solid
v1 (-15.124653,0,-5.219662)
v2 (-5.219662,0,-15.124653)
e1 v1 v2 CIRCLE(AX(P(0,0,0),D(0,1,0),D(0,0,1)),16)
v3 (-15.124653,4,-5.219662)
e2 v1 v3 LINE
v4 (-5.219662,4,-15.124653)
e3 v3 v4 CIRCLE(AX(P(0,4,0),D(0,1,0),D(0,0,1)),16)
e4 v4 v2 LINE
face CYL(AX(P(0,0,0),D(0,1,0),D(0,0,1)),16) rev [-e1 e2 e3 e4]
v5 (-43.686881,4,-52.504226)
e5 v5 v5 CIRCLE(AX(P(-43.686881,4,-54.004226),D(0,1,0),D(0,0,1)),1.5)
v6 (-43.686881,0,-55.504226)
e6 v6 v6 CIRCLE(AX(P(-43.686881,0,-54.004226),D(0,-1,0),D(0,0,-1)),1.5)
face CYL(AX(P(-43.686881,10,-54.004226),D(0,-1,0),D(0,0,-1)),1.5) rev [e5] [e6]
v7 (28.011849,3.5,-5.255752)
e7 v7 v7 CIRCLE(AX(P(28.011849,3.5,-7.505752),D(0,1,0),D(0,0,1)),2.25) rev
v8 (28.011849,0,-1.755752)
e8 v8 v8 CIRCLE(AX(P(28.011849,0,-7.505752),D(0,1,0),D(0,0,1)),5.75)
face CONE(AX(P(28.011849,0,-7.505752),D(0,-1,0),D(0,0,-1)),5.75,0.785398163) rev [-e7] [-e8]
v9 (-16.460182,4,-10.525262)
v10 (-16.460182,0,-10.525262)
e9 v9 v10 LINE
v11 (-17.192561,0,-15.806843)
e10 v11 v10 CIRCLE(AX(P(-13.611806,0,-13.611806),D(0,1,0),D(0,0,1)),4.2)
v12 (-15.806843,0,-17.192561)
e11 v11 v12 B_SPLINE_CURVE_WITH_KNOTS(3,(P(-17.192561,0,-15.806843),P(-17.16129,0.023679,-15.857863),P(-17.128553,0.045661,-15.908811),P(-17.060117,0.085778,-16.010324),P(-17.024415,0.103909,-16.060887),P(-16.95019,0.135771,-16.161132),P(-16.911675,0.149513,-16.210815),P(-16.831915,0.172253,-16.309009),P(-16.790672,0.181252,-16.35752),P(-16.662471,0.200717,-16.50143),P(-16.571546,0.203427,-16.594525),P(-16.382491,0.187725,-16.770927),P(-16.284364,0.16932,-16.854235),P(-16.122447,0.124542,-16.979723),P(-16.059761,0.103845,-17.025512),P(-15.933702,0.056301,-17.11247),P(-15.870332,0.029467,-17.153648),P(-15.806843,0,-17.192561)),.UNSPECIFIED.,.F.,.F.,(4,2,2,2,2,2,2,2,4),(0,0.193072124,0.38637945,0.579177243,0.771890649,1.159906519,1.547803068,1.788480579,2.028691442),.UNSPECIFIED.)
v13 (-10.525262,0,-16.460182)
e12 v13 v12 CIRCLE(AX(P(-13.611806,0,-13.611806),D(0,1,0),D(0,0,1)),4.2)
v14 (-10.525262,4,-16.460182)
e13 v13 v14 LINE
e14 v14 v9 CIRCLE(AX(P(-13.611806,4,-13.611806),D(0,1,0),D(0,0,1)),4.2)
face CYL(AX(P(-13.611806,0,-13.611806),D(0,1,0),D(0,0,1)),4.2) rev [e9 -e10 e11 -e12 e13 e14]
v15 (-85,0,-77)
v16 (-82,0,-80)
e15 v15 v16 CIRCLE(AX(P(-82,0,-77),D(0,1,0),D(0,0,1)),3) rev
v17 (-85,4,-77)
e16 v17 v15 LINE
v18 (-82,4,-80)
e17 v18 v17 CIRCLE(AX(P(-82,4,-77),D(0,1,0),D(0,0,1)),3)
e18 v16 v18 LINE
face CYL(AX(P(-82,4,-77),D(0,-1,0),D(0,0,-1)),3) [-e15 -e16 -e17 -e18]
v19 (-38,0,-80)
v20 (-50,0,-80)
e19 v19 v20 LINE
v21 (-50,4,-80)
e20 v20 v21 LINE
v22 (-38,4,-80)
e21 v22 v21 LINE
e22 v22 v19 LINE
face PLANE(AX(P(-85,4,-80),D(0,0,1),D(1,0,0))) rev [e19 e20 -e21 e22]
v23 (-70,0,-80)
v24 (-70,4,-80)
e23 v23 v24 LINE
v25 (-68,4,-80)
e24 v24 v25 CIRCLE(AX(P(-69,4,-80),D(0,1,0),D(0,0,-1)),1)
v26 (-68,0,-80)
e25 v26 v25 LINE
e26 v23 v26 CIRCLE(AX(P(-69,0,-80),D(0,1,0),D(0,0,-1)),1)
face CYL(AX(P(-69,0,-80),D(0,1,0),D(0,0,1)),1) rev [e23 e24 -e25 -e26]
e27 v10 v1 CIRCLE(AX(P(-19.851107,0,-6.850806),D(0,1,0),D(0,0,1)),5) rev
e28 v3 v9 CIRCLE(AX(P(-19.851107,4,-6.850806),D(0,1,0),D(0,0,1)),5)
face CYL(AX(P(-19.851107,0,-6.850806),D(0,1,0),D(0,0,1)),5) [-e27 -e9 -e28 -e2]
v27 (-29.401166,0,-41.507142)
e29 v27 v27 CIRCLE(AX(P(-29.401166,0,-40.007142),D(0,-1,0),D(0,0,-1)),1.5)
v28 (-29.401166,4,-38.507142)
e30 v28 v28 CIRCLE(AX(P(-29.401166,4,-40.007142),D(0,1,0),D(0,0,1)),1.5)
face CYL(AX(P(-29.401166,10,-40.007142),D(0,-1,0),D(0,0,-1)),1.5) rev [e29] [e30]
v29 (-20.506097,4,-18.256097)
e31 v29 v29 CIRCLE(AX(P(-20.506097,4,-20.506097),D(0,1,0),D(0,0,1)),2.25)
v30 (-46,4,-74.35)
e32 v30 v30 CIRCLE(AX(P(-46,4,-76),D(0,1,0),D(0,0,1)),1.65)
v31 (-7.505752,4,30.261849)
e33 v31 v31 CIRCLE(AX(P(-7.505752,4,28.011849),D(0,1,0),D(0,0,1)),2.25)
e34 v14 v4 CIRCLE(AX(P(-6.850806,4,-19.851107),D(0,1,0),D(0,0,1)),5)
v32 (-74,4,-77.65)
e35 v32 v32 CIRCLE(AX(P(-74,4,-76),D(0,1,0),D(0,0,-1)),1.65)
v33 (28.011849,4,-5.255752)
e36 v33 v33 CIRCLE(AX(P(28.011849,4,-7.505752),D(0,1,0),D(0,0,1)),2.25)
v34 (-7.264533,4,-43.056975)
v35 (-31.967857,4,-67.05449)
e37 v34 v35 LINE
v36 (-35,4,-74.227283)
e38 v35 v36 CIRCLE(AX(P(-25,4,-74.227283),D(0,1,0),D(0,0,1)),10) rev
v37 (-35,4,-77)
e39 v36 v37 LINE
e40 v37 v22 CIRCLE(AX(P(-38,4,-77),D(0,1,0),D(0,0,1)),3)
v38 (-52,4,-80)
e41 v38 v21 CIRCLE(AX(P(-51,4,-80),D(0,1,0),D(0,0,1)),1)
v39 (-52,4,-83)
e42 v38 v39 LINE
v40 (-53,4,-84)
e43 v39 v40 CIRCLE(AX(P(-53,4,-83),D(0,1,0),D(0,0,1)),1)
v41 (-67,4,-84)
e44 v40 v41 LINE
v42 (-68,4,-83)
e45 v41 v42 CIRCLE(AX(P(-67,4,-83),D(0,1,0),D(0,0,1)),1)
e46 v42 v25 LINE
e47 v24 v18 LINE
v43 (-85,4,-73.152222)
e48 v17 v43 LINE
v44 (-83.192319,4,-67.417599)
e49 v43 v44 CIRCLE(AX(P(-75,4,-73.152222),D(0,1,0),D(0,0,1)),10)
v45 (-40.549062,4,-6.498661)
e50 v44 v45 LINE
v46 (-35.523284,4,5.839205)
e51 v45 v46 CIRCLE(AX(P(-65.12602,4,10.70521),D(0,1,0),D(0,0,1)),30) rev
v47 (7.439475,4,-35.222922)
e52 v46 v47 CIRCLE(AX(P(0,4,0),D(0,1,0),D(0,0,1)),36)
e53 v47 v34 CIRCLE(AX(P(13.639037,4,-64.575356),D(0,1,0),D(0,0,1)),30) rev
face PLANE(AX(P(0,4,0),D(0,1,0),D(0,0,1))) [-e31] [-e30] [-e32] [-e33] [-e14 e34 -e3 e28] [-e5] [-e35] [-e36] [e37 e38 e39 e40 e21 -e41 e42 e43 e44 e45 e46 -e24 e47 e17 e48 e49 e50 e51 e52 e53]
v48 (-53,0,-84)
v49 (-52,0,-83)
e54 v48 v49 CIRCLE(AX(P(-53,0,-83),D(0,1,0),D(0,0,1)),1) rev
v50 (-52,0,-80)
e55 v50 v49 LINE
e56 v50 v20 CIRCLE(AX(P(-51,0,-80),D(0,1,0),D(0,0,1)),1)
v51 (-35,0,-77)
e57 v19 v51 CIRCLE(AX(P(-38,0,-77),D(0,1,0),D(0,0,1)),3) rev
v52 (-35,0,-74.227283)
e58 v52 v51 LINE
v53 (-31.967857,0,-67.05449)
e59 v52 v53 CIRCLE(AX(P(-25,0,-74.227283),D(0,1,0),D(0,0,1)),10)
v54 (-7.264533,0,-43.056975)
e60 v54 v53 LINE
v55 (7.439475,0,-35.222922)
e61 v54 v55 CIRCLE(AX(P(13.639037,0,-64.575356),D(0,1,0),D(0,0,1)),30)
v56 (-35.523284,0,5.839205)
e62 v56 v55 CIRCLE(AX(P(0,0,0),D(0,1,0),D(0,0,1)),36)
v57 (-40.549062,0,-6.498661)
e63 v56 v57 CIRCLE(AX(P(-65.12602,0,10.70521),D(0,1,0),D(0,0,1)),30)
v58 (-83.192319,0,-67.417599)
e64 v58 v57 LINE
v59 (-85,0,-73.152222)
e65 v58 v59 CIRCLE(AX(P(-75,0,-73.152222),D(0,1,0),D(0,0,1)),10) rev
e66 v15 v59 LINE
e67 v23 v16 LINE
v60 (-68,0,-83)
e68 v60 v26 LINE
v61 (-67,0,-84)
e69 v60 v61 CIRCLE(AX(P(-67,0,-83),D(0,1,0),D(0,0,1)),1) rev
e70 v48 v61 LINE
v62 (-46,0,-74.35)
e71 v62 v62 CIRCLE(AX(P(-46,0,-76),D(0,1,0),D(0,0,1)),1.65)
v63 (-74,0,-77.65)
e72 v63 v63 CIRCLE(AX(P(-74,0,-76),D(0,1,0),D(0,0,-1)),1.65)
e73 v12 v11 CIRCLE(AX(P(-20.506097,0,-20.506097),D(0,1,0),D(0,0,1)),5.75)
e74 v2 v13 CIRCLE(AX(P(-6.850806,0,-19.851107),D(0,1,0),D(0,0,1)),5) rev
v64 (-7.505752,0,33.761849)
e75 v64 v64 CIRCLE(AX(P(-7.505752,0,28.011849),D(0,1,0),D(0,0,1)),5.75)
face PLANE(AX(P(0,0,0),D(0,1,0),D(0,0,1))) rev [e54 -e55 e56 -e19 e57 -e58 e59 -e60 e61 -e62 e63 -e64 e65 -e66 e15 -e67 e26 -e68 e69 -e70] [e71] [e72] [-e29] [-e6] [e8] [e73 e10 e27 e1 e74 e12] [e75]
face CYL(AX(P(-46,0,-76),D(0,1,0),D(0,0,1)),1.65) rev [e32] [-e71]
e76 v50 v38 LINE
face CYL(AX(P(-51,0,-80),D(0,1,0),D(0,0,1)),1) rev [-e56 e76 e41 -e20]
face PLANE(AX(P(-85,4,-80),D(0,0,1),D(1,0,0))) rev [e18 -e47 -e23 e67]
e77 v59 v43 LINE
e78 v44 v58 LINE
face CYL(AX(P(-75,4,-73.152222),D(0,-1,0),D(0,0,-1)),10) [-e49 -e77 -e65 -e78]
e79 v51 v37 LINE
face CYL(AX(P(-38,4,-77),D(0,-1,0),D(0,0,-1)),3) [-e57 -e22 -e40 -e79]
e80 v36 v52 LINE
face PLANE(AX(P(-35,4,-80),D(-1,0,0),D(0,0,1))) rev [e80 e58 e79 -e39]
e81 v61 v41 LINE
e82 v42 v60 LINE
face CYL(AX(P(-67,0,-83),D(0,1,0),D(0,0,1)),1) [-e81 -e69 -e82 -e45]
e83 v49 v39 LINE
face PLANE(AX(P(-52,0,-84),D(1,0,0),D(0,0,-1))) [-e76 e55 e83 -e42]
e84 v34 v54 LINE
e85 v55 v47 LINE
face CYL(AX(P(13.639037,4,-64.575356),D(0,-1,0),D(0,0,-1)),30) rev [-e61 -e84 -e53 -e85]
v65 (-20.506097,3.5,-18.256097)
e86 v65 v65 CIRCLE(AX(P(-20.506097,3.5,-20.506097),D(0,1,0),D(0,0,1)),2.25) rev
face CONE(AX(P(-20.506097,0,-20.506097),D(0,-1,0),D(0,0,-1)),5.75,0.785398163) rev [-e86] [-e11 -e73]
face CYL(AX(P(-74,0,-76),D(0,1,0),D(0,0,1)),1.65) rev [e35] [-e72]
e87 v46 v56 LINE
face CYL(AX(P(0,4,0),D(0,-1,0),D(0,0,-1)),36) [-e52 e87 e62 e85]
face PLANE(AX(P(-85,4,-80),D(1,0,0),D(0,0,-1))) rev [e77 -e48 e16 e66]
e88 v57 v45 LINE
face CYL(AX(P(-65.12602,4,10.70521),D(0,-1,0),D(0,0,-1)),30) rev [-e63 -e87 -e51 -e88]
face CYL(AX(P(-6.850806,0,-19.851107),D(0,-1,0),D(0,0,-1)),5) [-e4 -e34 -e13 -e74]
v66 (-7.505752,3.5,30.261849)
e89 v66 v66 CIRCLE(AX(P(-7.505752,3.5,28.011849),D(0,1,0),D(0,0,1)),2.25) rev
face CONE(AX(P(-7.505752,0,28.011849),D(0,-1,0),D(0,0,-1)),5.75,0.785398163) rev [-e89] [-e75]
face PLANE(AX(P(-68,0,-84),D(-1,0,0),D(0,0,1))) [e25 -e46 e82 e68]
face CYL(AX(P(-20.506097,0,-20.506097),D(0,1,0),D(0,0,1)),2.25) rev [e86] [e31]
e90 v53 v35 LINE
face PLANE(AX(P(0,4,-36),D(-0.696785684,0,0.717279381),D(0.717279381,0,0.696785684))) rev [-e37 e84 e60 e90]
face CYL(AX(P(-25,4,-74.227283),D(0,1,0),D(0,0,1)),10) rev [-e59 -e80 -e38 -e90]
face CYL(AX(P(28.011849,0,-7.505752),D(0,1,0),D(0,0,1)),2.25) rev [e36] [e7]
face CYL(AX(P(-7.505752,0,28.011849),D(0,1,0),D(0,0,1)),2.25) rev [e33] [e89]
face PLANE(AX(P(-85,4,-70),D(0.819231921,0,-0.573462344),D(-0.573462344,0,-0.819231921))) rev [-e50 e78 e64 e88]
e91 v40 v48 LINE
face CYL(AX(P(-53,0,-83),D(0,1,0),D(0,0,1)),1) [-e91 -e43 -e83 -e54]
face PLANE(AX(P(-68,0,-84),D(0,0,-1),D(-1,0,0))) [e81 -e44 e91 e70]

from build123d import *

# Parameters (mm, degrees)
EXTRUDE_1_DEPTH     = 4
FILLET_1_R          = 30
FILLET_2_R          = 30
SKETCH_2_R          = 2.25
SKETCH_2_R_2        = 16
CUT_EXTRUDE_1_DEPTH = 4
SKETCH_3_R          = 4.2
CUT_EXTRUDE_2_DEPTH = 4
FILLET_3_R          = 5
SKETCH_4_R          = 1.65
CUT_EXTRUDE_3_DEPTH = 4
FILLET_4_R          = 10
FILLET_5_R          = 3
SKETCH_7_W          = 16
SKETCH_7_H          = 4
EXTRUDE_3_DEPTH     = 4
CUT_EXTRUDE_5_DEPTH = 4
FILLET_7_R          = 1
CHAMFER_1_SIZE      = 3.5
SKETCH_9_R          = 1.2
CUT_EXTRUDE_6_DEPTH = 10
SKETCH_10_R         = 1.5
CUT_EXTRUDE_7_DEPTH = 10


with BuildPart() as part:
    # 草图1 → 凸台-拉伸1 (new body)
    with BuildSketch(Plane(origin=(0, 0, 0), x_dir=(1, 0, 0), z_dir=(0, 1, 0))):
        with BuildLine():
            Line((-85, 80), (-35, 80))
            Line((-35, 80), (-35, 70))
            Line((-35, 70), (0, 36))
            ThreePointArc((0, 36), (25.455844123, -25.455844123), (-36, 0))
            Line((-36, 0), (-85, 70))
            Line((-85, 70), (-85, 80))
        make_face()
    extrude(amount=EXTRUDE_1_DEPTH)

    # 圆角1
    fillet_1_edges = [part.edges().sort_by_distance(p)[0] for p in [
        (0, 2, -36),
    ]]
    fillet(fillet_1_edges, radius=FILLET_1_R)

    # 圆角2
    fillet_2_edges = [part.edges().sort_by_distance(p)[0] for p in [
        (-36, 2, 0),
    ]]
    fillet(fillet_2_edges, radius=FILLET_2_R)

    # 草图2 → 切除-拉伸1 (cut)
    with BuildSketch(Plane(origin=(0, 4, 0), x_dir=(1, 0, 0), z_dir=(0, 1, 0))):
        with Locations(Location((-20.506096654, 20.506096654, 0), (0, 0, 270))):
            Circle(SKETCH_2_R)
        with Locations(Location((28.011848962, 7.505752308, 0), (0, 0, 270))):
            Circle(SKETCH_2_R)
        with Locations(Location((-7.505752308, -28.011848962, 0), (0, 0, 270))):
            Circle(SKETCH_2_R)
        with Locations(Location((0, 0, 0), (0, 0, 270))):
            Circle(SKETCH_2_R_2)
    extrude(amount=-CUT_EXTRUDE_1_DEPTH, mode=Mode.SUBTRACT)

    # 草图3 → 切除-拉伸2 (cut)
    with BuildSketch(Plane(origin=(0, 4, 0), x_dir=(1, 0, 0), z_dir=(0, 1, 0))):
        with Locations((-13.611805538, 13.611805538)):
            Circle(SKETCH_3_R)
    extrude(amount=-CUT_EXTRUDE_2_DEPTH, mode=Mode.SUBTRACT)

    # 圆角3
    fillet_3_edges = [part.edges().sort_by_distance(p)[0] for p in [
        (-9.473632004, 2, -12.893808462),
        (-12.893808462, 2, -9.473632004),
    ]]
    fillet(fillet_3_edges, radius=FILLET_3_R)

    # 草图4 → 切除-拉伸3 (cut)
    with BuildSketch(Plane(origin=(0, 4, 0), x_dir=(1, 0, 0), z_dir=(0, 1, 0))):
        with Locations(Location((-46, 76, 0), (0, 0, 270))):
            Circle(SKETCH_4_R)
        with Locations(Location((-74, 76, 0), (0, 0, 90))):
            Circle(SKETCH_4_R)
    extrude(amount=-CUT_EXTRUDE_3_DEPTH, mode=Mode.SUBTRACT)

    # 圆角4
    fillet_4_edges = [part.edges().sort_by_distance(p)[0] for p in [
        (-35, 2, -70),
        (-85, 2, -70),
    ]]
    fillet(fillet_4_edges, radius=FILLET_4_R)

    # 圆角5
    fillet_5_edges = [part.edges().sort_by_distance(p)[0] for p in [
        (-85, 2, -80),
        (-35, 2, -80),
    ]]
    fillet(fillet_5_edges, radius=FILLET_5_R)

    # 草图7 → 凸台-拉伸3 (add)
    with BuildSketch(Plane(origin=(0, 4, 0), x_dir=(1, 0, 0), z_dir=(0, 1, 0))):
        with Locations((-60, 82)):
            Rectangle(SKETCH_7_W, SKETCH_7_H)
    extrude(amount=-EXTRUDE_3_DEPTH)

    # 草图8 → 切除-拉伸5 (cut)
    with BuildSketch(Plane(origin=(0, 4, 0), x_dir=(1, 0, 0), z_dir=(0, 1, 0))):
        with BuildLine():
            Line((-50, 80), (-52, 80))
            ThreePointArc((-52, 80), (-51, 79), (-50, 80))
        make_face()
        with BuildLine():
            Line((-70, 80), (-68, 80))
            ThreePointArc((-68, 80), (-69, 79), (-70, 80))
        make_face()
    extrude(amount=-CUT_EXTRUDE_5_DEPTH, mode=Mode.SUBTRACT)

    # 圆角7
    fillet_7_edges = [part.edges().sort_by_distance(p)[0] for p in [
        (-52, 2, -84),
        (-68, 2, -84),
    ]]
    fillet(fillet_7_edges, radius=FILLET_7_R)

    # 倒角1
    # the kernel refuses this chamfer: 3.5 mm, written as the material it takes off along each edge
    with BuildSketch(Plane(origin=(-20.506096654, 0, -20.506096654), x_dir=(0, 0, 1), z_dir=(-1, 0, 0))) as chamfer_1_piece_1:
        Polygon((2.25 + CHAMFER_1_SIZE, 0), (2.25, CHAMFER_1_SIZE), (2.25, 0), align=None)
    revolve(axis=Axis((-20.506096654, 0, -20.506096654), (0, 1, 0)), mode=Mode.SUBTRACT)
    with BuildSketch(Plane(origin=(28.011848962, 0, -7.505752308), x_dir=(0, 0, 1), z_dir=(-1, 0, 0))) as chamfer_1_piece_2:
        Polygon((2.25 + CHAMFER_1_SIZE, 0), (2.25, CHAMFER_1_SIZE), (2.25, 0), align=None)
    revolve(axis=Axis((28.011848962, 0, -7.505752308), (0, 1, 0)), mode=Mode.SUBTRACT)
    with BuildSketch(Plane(origin=(-7.505752308, 0, 28.011848962), x_dir=(0, 0, 1), z_dir=(-1, 0, 0))) as chamfer_1_piece_3:
        Polygon((2.25 + CHAMFER_1_SIZE, 0), (2.25, CHAMFER_1_SIZE), (2.25, 0), align=None)
    revolve(axis=Axis((-7.505752308, 0, 28.011848962), (0, 1, 0)), mode=Mode.SUBTRACT)

    # 草图9 → 切除-拉伸6 (cut)
    with BuildSketch(Plane.XZ):
        with Locations(Location((-29.401166302, -40.007142113, 0), (0, 0, 270))):
            Circle(SKETCH_9_R)
        with Locations(Location((-43.686880588, -54.004226358, 0), (0, 0, 270))):
            Circle(SKETCH_9_R)
    extrude(amount=-CUT_EXTRUDE_6_DEPTH, mode=Mode.SUBTRACT)

    # 草图10 → 切除-拉伸7 (cut)
    with BuildSketch(Plane.XZ):
        with Locations(Location((-29.401166302, -40.007142113, 0), (0, 0, 270))):
            Circle(SKETCH_10_R)
        with Locations(Location((-43.686880588, -54.004226358, 0), (0, 0, 270))):
            Circle(SKETCH_10_R)
    extrude(amount=-CUT_EXTRUDE_7_DEPTH, mode=Mode.SUBTRACT)


solid = part.part
